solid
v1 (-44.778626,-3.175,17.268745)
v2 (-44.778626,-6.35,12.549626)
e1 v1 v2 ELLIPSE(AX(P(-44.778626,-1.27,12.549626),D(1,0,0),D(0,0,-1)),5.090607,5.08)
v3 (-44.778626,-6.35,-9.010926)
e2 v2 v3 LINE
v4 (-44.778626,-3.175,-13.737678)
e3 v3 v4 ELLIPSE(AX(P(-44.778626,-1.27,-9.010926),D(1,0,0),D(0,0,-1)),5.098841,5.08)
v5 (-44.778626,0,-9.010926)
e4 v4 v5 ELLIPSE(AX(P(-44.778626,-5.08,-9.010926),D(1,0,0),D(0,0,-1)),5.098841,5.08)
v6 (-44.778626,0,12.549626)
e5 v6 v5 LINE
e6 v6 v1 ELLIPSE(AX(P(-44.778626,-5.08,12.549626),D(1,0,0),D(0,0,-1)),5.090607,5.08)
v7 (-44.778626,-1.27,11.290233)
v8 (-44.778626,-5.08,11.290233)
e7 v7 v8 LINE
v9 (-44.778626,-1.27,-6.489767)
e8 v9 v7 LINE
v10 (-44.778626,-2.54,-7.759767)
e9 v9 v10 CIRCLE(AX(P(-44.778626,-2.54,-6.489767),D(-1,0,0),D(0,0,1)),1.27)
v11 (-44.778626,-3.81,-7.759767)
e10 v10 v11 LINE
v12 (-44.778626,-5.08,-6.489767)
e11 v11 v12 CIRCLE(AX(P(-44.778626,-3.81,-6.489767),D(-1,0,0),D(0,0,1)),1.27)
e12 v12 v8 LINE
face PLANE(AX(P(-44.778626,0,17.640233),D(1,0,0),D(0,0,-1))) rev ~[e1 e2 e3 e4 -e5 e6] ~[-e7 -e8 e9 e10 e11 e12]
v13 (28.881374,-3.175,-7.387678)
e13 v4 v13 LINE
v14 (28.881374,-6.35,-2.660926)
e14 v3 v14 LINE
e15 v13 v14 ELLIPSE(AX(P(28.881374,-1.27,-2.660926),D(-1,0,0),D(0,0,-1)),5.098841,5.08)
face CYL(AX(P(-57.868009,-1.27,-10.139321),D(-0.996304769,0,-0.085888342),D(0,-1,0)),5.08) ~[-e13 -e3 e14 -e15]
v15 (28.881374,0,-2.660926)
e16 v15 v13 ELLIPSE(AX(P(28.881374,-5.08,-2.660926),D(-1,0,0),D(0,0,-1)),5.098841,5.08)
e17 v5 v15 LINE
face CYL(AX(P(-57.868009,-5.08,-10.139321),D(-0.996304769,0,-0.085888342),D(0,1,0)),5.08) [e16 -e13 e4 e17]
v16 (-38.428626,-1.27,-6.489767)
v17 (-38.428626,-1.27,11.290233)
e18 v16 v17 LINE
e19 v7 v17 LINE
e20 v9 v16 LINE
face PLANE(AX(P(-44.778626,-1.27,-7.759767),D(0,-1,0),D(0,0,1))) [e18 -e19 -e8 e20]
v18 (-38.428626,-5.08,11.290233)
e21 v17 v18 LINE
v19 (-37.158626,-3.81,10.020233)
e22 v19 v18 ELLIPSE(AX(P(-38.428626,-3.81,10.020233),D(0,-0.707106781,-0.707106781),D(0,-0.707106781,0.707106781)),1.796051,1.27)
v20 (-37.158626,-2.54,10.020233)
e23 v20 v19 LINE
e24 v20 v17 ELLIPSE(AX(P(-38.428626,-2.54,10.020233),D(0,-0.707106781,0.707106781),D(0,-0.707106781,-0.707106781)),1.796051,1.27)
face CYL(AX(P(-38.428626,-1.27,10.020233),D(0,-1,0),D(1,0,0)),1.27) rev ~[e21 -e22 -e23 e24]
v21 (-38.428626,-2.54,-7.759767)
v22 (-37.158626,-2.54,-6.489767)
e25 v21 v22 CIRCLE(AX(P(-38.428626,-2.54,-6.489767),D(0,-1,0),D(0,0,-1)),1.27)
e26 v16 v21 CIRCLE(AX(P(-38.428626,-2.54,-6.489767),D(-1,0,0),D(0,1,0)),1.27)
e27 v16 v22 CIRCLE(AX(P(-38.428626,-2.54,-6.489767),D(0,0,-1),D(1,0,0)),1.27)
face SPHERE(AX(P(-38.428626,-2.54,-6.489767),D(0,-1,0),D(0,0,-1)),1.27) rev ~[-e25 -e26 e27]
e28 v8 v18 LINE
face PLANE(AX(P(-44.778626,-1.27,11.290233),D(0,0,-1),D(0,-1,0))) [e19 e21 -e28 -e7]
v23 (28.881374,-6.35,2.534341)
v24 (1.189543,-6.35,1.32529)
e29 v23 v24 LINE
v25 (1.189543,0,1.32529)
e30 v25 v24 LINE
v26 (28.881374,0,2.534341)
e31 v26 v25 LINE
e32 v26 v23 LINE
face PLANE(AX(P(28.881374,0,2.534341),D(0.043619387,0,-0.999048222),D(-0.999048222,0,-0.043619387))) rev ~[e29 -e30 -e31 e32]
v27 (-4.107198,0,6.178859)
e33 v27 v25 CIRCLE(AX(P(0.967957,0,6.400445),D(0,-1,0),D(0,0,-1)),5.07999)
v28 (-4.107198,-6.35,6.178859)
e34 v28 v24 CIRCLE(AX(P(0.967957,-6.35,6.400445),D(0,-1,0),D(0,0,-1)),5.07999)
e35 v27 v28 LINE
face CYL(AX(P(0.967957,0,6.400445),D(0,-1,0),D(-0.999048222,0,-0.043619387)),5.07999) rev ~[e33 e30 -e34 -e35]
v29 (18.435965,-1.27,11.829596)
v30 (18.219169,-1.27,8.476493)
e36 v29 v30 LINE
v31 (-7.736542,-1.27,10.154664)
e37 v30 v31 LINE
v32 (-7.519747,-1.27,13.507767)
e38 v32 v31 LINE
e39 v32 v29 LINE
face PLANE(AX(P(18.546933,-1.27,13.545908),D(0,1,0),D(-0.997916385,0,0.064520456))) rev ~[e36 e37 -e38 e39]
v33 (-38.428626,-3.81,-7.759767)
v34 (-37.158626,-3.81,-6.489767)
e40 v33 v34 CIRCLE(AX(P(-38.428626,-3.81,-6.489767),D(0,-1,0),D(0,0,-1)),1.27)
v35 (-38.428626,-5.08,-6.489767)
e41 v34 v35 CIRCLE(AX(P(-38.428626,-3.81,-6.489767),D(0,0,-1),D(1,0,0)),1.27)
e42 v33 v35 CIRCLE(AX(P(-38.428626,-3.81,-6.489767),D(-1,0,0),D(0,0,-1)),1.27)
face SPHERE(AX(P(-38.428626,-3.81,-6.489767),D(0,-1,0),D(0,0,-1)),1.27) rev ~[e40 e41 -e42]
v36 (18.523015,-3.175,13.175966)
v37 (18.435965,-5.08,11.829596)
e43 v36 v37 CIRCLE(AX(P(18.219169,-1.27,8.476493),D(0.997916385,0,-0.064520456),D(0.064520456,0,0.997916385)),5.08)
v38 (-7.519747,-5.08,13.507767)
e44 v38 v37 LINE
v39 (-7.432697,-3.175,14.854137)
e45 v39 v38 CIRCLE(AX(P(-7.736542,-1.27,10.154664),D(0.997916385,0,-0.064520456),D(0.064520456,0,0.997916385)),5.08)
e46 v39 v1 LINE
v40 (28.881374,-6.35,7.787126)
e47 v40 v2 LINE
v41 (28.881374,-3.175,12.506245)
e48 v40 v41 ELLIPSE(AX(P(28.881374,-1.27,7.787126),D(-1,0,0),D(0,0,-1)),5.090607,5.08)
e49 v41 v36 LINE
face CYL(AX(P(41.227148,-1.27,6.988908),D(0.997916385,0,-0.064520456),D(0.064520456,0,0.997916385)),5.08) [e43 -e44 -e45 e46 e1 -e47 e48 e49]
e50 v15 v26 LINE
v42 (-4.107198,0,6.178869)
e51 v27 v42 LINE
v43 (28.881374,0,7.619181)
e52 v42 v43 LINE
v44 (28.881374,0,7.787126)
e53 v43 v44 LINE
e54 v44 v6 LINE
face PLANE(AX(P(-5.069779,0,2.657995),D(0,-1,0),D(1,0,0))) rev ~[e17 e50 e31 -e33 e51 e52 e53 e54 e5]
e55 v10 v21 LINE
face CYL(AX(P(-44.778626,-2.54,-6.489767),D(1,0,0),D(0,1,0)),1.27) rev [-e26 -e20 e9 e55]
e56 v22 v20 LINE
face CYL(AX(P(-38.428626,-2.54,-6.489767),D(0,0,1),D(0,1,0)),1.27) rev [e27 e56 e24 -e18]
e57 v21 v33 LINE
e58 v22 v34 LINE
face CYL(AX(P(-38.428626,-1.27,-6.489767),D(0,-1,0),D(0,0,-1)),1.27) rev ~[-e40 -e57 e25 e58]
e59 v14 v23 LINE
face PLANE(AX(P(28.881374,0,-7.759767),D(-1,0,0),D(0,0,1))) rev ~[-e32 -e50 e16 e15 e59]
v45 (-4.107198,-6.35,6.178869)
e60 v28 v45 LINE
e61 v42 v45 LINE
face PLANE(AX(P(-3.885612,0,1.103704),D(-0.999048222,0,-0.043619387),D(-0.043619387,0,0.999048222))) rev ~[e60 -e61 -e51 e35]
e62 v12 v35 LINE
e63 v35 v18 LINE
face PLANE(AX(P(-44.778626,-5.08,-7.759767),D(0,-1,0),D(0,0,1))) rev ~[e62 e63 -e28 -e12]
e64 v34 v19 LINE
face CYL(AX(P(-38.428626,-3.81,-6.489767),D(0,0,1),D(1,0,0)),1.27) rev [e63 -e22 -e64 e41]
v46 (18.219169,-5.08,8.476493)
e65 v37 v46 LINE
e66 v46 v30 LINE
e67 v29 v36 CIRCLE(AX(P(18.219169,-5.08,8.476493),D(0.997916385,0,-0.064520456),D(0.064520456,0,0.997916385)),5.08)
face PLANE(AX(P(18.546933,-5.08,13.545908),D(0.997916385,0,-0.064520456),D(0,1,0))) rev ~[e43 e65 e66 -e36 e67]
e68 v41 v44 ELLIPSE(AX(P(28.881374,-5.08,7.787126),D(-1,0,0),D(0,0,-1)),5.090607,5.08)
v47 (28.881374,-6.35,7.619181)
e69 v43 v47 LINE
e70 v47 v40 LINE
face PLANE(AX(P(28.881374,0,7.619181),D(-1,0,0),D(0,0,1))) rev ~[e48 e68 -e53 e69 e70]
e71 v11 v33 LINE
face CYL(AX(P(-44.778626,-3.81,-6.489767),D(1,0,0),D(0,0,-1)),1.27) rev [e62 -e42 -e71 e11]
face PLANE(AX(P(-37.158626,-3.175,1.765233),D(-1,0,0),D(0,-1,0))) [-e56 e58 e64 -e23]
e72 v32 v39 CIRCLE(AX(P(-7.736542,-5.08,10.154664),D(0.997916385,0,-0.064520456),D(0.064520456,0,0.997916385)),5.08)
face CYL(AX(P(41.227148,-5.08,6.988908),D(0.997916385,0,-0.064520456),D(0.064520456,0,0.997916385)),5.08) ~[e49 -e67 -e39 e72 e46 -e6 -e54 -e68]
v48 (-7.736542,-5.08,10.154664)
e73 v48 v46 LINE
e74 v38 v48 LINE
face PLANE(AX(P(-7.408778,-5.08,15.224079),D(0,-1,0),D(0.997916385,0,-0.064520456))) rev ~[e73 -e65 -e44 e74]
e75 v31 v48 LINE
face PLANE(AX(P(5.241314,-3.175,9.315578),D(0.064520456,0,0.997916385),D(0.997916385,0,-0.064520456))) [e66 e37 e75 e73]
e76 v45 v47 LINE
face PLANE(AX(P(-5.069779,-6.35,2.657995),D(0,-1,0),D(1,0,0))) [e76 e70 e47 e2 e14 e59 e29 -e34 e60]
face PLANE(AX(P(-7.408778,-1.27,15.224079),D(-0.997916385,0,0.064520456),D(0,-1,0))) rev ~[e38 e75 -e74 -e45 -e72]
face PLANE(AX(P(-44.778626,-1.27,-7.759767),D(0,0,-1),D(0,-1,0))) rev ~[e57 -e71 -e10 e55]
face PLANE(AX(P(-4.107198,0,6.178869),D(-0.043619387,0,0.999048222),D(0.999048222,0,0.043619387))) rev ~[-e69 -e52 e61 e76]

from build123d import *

# Parameters (mm, degrees)
F1_DEPTH    = 6.35
F2_W        = 3.81
F2_H        = 19.05
F3_DEPTH    = 7.62
F4_R        = 1.27
F5_R        = 1.27
F7_DEPTH    = 5.08
F8_T1_DEPTH = 99.3332002554
F8_T3_DEPTH = 99.2137995652
F9_R        = 5.07999


# Not quite as in the source:
# - a fillet or chamfer that OpenCascade refuses, or shapes differently, is made with other operations: its cross-section is extruded or revolved along the edge and cut away or added
# - a fillet or chamfer is up to 0.001 mm smaller than in the source, because OpenCascade refuses the exact size


with BuildPart() as f1:
    # F0 (on Front) → F1 (new body)
    with BuildSketch(Plane.XZ):
        Polygon((28.8813739334, 7.6191808492), (28.8813739334, 12.8777329371), (-44.7786260666, 17.6402329371), (-44.7786260666, -14.1097670629), (28.8813739334, -7.7597670629), (28.8813739334, 2.5343412086), (-3.8856118554, 1.1037037128), (-4.1071983432, 6.1788686784), align=None)
    extrude(amount=F1_DEPTH)

    # F2 (on face) → F3 (cut)
    with BuildSketch(Plane(origin=(-44.7786260666, 0, 0), x_dir=(0, -1, 0), z_dir=(-1, 0, 0))):
        with Locations((3.175, 1.7652329371)):
            Rectangle(F2_W, F2_H)
    extrude(amount=-F3_DEPTH, mode=Mode.SUBTRACT)

    # F4
    f4_edges = [f1.edges().sort_by_distance(p)[0] for p in [
        (-37.158626, -3.175, -7.759767),
    ]]
    fillet(f4_edges, radius=F4_R)

    # F5
    f5_edges = [f1.edges().sort_by_distance(p)[0] for p in [
        (-37.158626, -3.175, 11.290233),
        (-37.158626, -5.08, 2.400233),
        (-37.158626, -1.27, 2.400233),
    ]]
    fillet(f5_edges, radius=F5_R)

    # F6 (on face) → F7 (cut)
    with BuildSketch(Plane(origin=(0.9493759321, 0, 14.6836810837), x_dir=(0.9979163847, 0, -0.0645204559), z_dir=(0.0645204559, 0, 0.9979163847))):
        Polygon((15.2903190595, -1.27), (2.5903190595, -1.27), (-8.3756055683, -1.27), (-8.3756055683, -5.08), (15.2903190595, -5.08), (17.6343005151, -5.08), (17.6343005151, -1.27), align=None)
    extrude(amount=-F7_DEPTH, mode=Mode.SUBTRACT)

    # F8: fillet of radius 5.08 on 4 edges, made by hand

    # F8_s2 → F8_t1 (cut)
    with BuildSketch(Plane(origin=(-58.308759718, 0, -5.0266172171), x_dir=(0, 1, 0), z_dir=(0.996304769, 0, 0.0858883422))):
        with BuildLine():
            ThreePointArc((-6.35, -5.1316662572), (-4.8621024484, -8.7237687056), (-1.27, -10.2116662572))
            Line((-1.27, -10.2116662572), (-6.35, -10.2116662572))
            Line((-6.35, -10.2116662572), (-6.35, -5.1316662572))
        make_face()
        with BuildLine():
            ThreePointArc((0, -5.1316662572), (-1.4878975516, -8.7237687056), (-5.08, -10.2116662572))
            Line((-5.08, -10.2116662572), (0, -10.2116662572))
            Line((0, -10.2116662572), (0, -5.1316662572))
        make_face()
    extrude(amount=F8_T1_DEPTH, mode=Mode.SUBTRACT)

    # F8_s4 → F8_t3 (cut)
    with BuildSketch(Plane(origin=(40.6055360865, 0, -2.6253579366), x_dir=(0, 1, 0), z_dir=(-0.9979163847, 0, 0.0645204559))):
        with BuildLine():
            ThreePointArc((-1.27, -14.7143401085), (-4.8621024484, -13.2264425569), (-6.35, -9.6343401085))
            Line((-6.35, -9.6343401085), (-6.35, -14.7143401085))
            Line((-6.35, -14.7143401085), (-1.27, -14.7143401085))
        make_face()
        with BuildLine():
            ThreePointArc((-5.08, -14.7143401085), (-1.4878975516, -13.2264425569), (0, -9.6343401085))
            Line((0, -9.6343401085), (0, -14.7143401085))
            Line((0, -14.7143401085), (-5.08, -14.7143401085))
        make_face()
    extrude(amount=F8_T3_DEPTH, mode=Mode.SUBTRACT)

    # F9 (radius 5.08 in the source; OpenCascade refuses exactly that, so slightly less here)
    f9_edges = [f1.edges().sort_by_distance(p)[0] for p in [
        (-3.885612, -3.175, 1.103704),
    ]]
    fillet(f9_edges, radius=F9_R)


solid = f1.part
